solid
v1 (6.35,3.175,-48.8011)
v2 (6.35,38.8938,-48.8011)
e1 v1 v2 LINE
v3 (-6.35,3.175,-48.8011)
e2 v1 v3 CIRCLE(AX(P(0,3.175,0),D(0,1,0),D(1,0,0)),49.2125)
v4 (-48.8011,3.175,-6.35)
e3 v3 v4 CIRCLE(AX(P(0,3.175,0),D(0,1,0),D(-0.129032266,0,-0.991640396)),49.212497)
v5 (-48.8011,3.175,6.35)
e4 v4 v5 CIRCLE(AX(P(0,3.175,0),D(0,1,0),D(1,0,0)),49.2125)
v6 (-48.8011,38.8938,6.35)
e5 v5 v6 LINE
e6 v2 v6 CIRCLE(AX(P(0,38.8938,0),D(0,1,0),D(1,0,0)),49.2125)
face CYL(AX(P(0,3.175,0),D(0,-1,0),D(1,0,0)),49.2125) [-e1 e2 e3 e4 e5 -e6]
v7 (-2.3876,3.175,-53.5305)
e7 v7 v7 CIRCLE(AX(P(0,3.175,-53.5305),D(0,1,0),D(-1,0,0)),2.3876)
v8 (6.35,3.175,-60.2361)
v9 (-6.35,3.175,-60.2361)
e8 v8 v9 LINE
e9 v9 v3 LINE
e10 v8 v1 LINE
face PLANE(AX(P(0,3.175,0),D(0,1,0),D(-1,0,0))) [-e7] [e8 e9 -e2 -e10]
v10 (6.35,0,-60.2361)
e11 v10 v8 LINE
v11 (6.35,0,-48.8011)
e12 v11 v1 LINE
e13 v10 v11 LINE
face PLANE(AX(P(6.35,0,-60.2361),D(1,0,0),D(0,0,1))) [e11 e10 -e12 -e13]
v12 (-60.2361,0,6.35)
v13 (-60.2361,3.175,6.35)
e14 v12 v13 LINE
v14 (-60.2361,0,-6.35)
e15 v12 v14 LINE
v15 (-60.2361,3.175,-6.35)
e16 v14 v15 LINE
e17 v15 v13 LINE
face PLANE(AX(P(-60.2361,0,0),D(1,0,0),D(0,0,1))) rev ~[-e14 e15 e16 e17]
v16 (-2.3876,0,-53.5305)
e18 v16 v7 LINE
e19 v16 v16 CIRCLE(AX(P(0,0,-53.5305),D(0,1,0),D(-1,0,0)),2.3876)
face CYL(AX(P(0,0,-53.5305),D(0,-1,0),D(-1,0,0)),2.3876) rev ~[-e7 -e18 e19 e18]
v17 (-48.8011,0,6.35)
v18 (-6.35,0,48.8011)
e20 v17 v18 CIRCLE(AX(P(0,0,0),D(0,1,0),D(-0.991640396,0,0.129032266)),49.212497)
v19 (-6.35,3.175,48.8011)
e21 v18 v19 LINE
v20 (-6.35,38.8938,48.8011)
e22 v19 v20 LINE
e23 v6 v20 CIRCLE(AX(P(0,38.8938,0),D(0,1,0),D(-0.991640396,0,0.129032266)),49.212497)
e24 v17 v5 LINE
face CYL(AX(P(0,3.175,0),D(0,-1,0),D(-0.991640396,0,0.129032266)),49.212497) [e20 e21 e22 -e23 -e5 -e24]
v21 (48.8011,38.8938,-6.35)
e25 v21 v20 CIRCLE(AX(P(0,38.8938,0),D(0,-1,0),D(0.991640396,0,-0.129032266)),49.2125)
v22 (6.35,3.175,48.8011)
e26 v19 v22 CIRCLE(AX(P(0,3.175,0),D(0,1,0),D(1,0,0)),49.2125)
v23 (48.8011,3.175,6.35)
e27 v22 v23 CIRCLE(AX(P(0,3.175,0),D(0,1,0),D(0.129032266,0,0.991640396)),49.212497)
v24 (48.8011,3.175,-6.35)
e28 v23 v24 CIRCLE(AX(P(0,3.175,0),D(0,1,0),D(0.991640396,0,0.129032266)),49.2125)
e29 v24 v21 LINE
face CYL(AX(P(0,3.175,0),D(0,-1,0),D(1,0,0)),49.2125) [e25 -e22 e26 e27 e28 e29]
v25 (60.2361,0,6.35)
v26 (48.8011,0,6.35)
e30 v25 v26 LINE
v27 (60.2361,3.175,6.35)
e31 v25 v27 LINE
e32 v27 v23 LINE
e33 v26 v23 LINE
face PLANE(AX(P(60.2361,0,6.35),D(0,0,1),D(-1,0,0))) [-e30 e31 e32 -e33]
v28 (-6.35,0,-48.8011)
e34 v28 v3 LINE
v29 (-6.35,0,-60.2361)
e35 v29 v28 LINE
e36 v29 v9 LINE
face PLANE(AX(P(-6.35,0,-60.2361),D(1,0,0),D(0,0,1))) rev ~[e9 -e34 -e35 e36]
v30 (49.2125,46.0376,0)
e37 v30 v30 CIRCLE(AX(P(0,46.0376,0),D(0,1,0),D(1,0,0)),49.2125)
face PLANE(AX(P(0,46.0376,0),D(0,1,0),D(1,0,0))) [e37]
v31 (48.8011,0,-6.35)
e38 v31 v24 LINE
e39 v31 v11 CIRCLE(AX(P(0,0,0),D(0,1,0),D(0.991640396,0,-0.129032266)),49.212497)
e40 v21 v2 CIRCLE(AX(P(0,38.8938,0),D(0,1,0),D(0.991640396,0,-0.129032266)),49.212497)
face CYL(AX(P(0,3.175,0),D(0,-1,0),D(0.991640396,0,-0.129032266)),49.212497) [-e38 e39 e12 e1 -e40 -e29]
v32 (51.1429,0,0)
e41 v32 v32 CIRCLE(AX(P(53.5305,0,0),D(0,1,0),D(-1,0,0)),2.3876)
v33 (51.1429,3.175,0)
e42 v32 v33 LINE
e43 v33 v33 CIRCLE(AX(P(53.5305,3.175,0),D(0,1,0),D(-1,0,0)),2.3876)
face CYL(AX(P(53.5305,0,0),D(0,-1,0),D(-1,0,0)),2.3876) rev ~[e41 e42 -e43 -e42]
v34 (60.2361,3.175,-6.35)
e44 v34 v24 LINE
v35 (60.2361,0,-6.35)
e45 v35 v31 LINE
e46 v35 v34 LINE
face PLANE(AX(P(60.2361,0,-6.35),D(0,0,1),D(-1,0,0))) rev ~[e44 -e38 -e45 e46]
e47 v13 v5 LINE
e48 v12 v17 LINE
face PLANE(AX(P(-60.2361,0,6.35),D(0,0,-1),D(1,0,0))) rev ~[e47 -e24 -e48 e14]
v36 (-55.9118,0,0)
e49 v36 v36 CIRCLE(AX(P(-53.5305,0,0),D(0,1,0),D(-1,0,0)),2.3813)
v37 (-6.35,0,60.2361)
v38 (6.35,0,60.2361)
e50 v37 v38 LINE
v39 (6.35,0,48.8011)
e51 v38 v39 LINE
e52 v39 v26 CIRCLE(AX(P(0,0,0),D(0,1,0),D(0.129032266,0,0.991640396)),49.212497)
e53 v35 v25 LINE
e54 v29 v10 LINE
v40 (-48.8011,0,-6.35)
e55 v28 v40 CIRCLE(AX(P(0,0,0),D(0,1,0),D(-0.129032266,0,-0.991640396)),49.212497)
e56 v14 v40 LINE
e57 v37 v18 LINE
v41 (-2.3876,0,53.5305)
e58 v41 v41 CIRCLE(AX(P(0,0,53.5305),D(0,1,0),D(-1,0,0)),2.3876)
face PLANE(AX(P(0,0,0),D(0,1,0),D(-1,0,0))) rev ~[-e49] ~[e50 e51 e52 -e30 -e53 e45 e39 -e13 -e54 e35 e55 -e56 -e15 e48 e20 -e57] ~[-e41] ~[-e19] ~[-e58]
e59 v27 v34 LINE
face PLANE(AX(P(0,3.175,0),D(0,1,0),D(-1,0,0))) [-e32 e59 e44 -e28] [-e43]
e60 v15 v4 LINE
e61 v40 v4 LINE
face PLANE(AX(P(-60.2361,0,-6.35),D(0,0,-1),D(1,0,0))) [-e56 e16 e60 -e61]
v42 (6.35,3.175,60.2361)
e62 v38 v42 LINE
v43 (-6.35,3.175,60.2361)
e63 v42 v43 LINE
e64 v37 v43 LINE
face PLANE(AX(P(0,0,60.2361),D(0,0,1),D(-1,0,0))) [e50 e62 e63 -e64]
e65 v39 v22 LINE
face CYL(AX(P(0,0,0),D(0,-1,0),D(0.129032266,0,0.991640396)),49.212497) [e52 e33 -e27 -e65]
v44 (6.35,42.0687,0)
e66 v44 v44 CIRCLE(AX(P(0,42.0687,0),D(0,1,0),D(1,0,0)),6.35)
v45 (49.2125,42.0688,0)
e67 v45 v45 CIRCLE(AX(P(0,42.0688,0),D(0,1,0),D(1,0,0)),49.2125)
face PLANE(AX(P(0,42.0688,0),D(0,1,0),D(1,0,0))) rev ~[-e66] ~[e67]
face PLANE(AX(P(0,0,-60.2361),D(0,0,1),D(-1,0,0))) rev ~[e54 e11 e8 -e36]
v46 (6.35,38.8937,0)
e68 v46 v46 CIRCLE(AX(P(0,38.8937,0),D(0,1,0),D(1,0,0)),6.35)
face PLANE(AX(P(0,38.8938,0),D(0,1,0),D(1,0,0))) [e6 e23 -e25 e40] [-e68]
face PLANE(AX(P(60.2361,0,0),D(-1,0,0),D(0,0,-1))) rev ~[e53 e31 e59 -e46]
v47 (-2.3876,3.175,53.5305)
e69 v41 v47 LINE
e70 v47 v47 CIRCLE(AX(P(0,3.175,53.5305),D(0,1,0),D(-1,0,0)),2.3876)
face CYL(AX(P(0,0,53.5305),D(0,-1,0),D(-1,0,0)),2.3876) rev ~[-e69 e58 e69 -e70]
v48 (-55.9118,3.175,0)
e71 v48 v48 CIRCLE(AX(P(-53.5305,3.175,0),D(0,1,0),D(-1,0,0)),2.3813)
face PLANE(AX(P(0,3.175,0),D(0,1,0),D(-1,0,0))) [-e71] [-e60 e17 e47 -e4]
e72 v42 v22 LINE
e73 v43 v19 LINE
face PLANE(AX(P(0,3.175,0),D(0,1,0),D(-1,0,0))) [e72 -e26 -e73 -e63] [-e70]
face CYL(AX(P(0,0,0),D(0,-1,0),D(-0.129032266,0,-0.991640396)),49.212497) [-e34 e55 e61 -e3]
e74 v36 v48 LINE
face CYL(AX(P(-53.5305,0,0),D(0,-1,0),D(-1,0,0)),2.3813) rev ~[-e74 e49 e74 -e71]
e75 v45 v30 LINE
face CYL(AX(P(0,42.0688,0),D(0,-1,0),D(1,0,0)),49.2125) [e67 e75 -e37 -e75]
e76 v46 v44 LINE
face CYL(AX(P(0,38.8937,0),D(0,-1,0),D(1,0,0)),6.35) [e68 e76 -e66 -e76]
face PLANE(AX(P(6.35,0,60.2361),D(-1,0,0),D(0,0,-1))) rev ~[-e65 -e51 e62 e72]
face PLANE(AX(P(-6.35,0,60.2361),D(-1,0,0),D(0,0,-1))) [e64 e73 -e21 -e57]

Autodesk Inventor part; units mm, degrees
ref_plane "YZ Plane" through (0, 0, 0) normal (1, 0, 0) x (0, 1, 0)
ref_plane "XZ Plane" through (0, 0, 0) normal (0, 1, 0) x (-1, 0, 0)
ref_plane "XY Plane" through (0, 0, 0) normal (0, 0, 1) x (1, 0, 0)
sketch "Sketch1" plane through (0, 0, 0) normal (0, 1, 0) x (-1, 0, 0)
  circle A0 centre (53.5305, 0) radius 2.3813
  circle A1 centre (0, -53.5305) radius 2.3876
  circle A2 centre (-53.5305, 0) radius 2.3876
  circle A3 centre (0, 53.5305) radius 2.3876
  line L0 (0, 60.2361) -> (-6.35, 60.2361)
  line L1 (-6.35, 60.2361) -> (6.35, 60.2361)
  line L2 (6.35, 60.2361) -> (6.35, 48.8011)
  line L3 (-6.35, 60.2361) -> (-6.35, 48.8011)
  line L4 (-60.2361, 0) -> (-60.2361, -6.35)
  line L5 (-60.2361, -6.35) -> (-60.2361, 6.35)
  line L6 (-60.2361, 6.35) -> (-48.8011, 6.35)
  line L7 (-60.2361, -6.35) -> (-48.8011, -6.35)
  line L8 (0, -60.2361) -> (-6.35, -60.2361)
  line L9 (-6.35, -60.2361) -> (6.35, -60.2361)
  line L10 (6.35, -60.2361) -> (6.35, -48.8011)
  line L11 (-6.35, -60.2361) -> (-6.35, -48.8011)
  line L12 (60.2361, 0) -> (60.2361, -6.35)
  line L13 (60.2361, -6.35) -> (60.2361, 6.35)
  line L14 (60.2361, 6.35) -> (48.8011, 6.35)
  line L15 (60.2361, -6.35) -> (48.8011, -6.35)
  arc A4 (6.35, -48.8011) -> (48.8011, -6.35) centre (0, 0) ccw
  arc A5 (-48.8011, -6.35) -> (-6.35, -48.8011) centre (0, 0) ccw
  arc A6 (48.8011, 6.35) -> (6.35, 48.8011) centre (0, 0) ccw
  arc A7 (-6.35, 48.8011) -> (-48.8011, 6.35) centre (0, 0) ccw
  circle A8 centre (0, 0) radius 49.2125
  dimension "d6" = 4.7625
  dimension "d7" = 4.7752
  dimension "d8" = 4.7752
  dimension "d9" = 4.7752
  dimension "d11" = 6.7056
  dimension "d12" = 6.7056
  dimension "d13" = 6.7056
  dimension "d14" = 6.7056
  dimension "d15" = 6.35
  dimension "d16" = 12.7
  dimension "d17" = 6.35
  dimension "d18" = 12.7
  dimension "d19" = 6.35
  dimension "d20" = 12.7
  dimension "d21" = 6.35
  dimension "d22" = 12.7
extrude "Extrusion1" add sketch "Sketch1" along normal blind 3.175
sketch "Sketch2" plane through (0, 3.175, 0) normal (0, 1, 0) x (1, 0, 0)
  arc A0 (48.8011, 6.35) -> (6.35, 48.8011) centre (0, 0) ccw projected
  arc A1 (-48.8011, -6.35) -> (-6.35, -48.8011) centre (0, 0) ccw projected
  circle A2 centre (0, 0) radius 49.2125
extrude "Extrusion2" add sketch "Sketch2" along normal blind 35.7188
sketch "Sketch3" plane through (0, 38.8937, 0) normal (0, 1, 0) x (1, 0, 0)
  circle A0 centre (0, 0) radius 49.2125 projected
  circle A1 centre (0, 0) radius 6.35
  dimension "d27" = 12.7
extrude "Extrusion3" add sketch "Sketch3" along normal blind 3.175 contours A1
sketch "Sketch4" plane through (0, 42.0688, 0) normal (0, 1, 0) x (1, 0, 0)
  circle A0 centre (0, 0) radius 6.35 projected
  circle A1 centre (0, 0) radius 49.2125
  dimension "d30" = 98.425
extrude "Extrusion4" add sketch "Sketch4" along normal blind 3.9688 contours A0 | A1
properties part number "Rotating Base"
